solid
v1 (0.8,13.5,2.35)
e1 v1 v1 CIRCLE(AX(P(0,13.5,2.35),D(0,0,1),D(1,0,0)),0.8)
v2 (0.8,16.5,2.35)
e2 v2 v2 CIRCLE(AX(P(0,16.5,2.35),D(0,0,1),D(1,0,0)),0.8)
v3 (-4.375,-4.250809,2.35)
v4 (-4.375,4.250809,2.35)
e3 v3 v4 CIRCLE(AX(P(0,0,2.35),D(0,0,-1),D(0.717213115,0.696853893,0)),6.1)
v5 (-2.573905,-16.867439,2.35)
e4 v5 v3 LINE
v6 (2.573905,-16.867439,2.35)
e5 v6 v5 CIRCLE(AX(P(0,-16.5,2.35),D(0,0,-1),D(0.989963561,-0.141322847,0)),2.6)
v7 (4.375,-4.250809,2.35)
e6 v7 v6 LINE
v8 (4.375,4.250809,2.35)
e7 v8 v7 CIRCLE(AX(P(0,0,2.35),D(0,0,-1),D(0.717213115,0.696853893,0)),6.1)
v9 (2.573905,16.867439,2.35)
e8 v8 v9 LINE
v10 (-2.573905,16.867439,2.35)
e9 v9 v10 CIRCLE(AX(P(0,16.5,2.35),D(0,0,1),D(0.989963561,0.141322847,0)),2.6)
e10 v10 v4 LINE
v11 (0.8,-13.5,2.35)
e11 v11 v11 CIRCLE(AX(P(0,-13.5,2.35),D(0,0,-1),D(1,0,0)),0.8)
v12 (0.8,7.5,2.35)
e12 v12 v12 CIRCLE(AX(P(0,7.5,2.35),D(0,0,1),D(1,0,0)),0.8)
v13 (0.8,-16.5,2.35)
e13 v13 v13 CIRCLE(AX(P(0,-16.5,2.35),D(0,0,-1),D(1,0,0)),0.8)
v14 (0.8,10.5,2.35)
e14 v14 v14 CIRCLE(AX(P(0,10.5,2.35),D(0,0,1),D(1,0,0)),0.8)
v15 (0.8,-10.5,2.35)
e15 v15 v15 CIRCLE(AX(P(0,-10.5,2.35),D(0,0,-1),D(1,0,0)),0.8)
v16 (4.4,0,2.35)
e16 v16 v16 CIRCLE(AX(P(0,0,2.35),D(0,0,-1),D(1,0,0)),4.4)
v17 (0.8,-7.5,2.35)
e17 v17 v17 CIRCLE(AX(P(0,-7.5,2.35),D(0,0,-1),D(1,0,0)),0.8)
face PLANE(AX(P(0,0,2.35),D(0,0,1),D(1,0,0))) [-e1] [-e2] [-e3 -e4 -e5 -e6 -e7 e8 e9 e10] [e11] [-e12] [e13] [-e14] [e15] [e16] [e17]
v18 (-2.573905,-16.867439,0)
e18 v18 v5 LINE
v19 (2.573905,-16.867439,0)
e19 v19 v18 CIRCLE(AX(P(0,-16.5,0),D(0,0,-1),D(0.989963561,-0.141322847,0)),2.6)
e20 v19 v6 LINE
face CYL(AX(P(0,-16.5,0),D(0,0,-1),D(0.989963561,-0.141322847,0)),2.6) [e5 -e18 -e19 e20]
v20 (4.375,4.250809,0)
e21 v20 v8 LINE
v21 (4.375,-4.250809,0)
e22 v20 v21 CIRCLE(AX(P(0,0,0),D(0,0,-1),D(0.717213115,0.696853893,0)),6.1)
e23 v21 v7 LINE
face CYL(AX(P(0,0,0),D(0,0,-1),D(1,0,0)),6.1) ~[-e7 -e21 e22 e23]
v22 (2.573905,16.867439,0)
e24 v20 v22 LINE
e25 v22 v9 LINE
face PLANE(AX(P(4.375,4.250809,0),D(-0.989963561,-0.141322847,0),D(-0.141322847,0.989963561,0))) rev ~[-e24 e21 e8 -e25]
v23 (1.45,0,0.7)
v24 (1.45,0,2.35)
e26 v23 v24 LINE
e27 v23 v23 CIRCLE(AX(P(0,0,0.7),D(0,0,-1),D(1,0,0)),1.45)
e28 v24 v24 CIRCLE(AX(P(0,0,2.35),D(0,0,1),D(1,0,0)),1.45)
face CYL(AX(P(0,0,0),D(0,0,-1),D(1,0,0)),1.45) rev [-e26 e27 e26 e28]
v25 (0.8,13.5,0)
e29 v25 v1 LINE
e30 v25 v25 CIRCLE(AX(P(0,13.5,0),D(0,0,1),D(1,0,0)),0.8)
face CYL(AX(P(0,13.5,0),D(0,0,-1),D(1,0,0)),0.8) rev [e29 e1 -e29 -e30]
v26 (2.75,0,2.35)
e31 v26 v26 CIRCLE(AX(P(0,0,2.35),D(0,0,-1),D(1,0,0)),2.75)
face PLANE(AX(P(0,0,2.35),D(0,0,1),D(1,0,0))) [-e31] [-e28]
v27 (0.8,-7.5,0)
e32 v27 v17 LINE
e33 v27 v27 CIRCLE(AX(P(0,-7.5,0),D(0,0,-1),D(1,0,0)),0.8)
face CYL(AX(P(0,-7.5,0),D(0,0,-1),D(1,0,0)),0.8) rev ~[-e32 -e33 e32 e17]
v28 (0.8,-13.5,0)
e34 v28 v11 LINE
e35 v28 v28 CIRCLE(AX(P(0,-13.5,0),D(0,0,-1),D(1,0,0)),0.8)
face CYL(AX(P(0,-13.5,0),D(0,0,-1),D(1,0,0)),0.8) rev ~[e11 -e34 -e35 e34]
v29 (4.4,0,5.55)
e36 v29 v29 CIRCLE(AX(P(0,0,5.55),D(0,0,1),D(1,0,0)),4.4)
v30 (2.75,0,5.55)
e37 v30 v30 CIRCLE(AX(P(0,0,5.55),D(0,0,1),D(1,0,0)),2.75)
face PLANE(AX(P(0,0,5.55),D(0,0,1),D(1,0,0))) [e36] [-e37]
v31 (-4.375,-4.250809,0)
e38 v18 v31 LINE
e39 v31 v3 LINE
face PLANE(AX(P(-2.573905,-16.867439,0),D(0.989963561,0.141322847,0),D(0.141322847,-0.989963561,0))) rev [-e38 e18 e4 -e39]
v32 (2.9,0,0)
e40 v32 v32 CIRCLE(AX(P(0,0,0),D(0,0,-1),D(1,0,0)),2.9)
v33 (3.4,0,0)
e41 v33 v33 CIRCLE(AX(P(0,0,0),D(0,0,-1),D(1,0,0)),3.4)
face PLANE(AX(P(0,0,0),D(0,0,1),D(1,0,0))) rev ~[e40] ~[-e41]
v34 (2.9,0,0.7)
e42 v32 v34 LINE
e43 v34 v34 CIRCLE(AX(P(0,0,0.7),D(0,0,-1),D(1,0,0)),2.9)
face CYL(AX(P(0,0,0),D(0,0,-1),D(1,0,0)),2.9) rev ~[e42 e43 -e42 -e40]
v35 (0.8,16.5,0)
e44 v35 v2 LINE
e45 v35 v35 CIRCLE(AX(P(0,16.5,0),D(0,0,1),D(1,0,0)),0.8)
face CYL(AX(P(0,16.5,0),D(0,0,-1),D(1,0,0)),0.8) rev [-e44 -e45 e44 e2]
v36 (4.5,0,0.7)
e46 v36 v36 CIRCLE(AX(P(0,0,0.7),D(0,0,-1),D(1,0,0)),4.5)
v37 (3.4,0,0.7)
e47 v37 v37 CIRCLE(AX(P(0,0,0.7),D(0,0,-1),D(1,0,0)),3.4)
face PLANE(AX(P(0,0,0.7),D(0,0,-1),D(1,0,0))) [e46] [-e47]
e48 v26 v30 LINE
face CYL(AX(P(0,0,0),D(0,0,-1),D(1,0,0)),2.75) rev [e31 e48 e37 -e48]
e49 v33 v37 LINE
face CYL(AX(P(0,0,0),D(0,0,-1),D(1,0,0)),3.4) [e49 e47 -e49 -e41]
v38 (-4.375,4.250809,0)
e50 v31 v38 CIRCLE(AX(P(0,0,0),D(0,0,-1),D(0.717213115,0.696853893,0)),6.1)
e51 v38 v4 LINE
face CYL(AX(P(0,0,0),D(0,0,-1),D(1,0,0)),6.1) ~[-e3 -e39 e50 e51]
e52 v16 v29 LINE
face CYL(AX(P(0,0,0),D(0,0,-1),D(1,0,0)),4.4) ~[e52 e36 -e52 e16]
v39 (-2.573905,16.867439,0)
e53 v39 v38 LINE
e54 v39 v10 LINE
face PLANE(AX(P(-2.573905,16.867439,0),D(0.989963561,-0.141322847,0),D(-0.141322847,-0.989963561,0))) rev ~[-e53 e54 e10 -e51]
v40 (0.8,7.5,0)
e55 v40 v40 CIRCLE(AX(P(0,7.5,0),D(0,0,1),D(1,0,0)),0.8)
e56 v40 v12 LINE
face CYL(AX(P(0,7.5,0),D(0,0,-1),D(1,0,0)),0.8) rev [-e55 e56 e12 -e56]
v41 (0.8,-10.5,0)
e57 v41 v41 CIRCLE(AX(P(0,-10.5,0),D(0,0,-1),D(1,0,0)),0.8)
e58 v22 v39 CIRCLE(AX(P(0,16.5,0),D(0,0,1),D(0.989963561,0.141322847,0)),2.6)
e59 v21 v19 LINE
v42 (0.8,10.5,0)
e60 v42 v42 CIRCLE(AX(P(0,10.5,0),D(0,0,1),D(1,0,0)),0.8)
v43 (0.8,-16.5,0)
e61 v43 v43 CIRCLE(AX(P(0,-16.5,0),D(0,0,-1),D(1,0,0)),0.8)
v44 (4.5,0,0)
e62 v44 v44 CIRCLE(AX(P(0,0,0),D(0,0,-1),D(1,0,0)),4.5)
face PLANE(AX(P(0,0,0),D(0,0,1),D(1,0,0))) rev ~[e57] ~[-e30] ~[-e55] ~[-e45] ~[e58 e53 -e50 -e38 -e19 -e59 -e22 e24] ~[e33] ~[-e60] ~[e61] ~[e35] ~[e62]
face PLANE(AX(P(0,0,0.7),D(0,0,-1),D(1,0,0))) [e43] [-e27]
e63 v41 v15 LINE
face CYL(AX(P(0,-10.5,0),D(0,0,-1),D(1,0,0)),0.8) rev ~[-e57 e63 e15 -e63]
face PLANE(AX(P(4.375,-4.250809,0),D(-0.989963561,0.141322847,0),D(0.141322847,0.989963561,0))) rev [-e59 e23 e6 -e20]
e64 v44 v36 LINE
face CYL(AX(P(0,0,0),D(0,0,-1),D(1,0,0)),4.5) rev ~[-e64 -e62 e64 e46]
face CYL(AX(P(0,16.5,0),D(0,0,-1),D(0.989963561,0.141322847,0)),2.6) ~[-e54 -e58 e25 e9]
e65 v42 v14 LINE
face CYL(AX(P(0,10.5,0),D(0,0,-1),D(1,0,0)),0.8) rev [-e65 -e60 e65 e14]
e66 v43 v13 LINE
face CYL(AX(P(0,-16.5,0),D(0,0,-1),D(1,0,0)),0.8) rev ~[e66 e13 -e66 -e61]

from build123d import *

# Parameters (mm, degrees)
F0_R     = 6.1
F0_R_2   = 4.4
F0_R_3   = 2.75
F0_R_4   = 1.45
F1_DEPTH = 2.35
F2_DEPTH = 5.55
F3_R     = 0.8
F4_DEPTH = 2.35
F6_R     = 4.5
F6_R_2   = 3.4
F6_R_3   = 2.9
F7_DEPTH = 0.7


# Not quite as in the source:
# - a pattern or mirror of a feature is missing from the dataset's text; its kind, count and spacing are read off the source's solid


with BuildPart() as f1:
    # F0 (on Top) → F1 (new body)
    with BuildSketch(Plane.XY):
        Circle(F0_R)
        Circle(F0_R_2, mode=Mode.SUBTRACT)
        Circle(F0_R_2)
        Circle(F0_R_3, mode=Mode.SUBTRACT)
        Circle(F0_R_3)
        Circle(F0_R_4, mode=Mode.SUBTRACT)
    extrude(amount=F1_DEPTH)

    # F0 (on Top) → F2 (join)
    with BuildSketch(Plane.XY):
        Circle(F0_R_2)
        Circle(F0_R_3, mode=Mode.SUBTRACT)
    extrude(amount=F2_DEPTH)

    # F3 (on Top) → F4 (join, through all)
    with BuildSketch(Plane.XY):
        with BuildLine():
            Line((-2.5739052597, 16.8674394022), (-4.375, 4.2508087466))
            ThreePointArc((-4.375, 4.2508087466), (0, 6.1), (4.375, 4.2508087466))
            Line((4.375, 4.2508087466), (2.5739052597, 16.8674394022))
            ThreePointArc((2.5739052597, 16.8674394022), (0, 19.1), (-2.5739052597, 16.8674394022))
        make_face()
        with Locations((0, 7.5)):
            Circle(F3_R, mode=Mode.SUBTRACT)
        with Locations((0, 10.5)):
            Circle(F3_R, mode=Mode.SUBTRACT)
        with Locations((0, 13.5)):
            Circle(F3_R, mode=Mode.SUBTRACT)
        with Locations((0, 16.5)):
            Circle(F3_R, mode=Mode.SUBTRACT)
    f4 = extrude(amount=F4_DEPTH)

    # F4_copies: F4 across plane
    add(f4.mirror(Plane(origin=(0, 0, 0), x_dir=(0, 0, -1), z_dir=(0, -1, 0))))

    # F6 (on face) → F7 (cut)
    with BuildSketch(Plane(origin=(0, 0, 0), x_dir=(1, 0, 0), z_dir=(0, 0, -1))):
        Circle(F6_R)
        Circle(F6_R_2, mode=Mode.SUBTRACT)
        Circle(F6_R_3)
    extrude(amount=-F7_DEPTH, mode=Mode.SUBTRACT)


solid = f1.part
